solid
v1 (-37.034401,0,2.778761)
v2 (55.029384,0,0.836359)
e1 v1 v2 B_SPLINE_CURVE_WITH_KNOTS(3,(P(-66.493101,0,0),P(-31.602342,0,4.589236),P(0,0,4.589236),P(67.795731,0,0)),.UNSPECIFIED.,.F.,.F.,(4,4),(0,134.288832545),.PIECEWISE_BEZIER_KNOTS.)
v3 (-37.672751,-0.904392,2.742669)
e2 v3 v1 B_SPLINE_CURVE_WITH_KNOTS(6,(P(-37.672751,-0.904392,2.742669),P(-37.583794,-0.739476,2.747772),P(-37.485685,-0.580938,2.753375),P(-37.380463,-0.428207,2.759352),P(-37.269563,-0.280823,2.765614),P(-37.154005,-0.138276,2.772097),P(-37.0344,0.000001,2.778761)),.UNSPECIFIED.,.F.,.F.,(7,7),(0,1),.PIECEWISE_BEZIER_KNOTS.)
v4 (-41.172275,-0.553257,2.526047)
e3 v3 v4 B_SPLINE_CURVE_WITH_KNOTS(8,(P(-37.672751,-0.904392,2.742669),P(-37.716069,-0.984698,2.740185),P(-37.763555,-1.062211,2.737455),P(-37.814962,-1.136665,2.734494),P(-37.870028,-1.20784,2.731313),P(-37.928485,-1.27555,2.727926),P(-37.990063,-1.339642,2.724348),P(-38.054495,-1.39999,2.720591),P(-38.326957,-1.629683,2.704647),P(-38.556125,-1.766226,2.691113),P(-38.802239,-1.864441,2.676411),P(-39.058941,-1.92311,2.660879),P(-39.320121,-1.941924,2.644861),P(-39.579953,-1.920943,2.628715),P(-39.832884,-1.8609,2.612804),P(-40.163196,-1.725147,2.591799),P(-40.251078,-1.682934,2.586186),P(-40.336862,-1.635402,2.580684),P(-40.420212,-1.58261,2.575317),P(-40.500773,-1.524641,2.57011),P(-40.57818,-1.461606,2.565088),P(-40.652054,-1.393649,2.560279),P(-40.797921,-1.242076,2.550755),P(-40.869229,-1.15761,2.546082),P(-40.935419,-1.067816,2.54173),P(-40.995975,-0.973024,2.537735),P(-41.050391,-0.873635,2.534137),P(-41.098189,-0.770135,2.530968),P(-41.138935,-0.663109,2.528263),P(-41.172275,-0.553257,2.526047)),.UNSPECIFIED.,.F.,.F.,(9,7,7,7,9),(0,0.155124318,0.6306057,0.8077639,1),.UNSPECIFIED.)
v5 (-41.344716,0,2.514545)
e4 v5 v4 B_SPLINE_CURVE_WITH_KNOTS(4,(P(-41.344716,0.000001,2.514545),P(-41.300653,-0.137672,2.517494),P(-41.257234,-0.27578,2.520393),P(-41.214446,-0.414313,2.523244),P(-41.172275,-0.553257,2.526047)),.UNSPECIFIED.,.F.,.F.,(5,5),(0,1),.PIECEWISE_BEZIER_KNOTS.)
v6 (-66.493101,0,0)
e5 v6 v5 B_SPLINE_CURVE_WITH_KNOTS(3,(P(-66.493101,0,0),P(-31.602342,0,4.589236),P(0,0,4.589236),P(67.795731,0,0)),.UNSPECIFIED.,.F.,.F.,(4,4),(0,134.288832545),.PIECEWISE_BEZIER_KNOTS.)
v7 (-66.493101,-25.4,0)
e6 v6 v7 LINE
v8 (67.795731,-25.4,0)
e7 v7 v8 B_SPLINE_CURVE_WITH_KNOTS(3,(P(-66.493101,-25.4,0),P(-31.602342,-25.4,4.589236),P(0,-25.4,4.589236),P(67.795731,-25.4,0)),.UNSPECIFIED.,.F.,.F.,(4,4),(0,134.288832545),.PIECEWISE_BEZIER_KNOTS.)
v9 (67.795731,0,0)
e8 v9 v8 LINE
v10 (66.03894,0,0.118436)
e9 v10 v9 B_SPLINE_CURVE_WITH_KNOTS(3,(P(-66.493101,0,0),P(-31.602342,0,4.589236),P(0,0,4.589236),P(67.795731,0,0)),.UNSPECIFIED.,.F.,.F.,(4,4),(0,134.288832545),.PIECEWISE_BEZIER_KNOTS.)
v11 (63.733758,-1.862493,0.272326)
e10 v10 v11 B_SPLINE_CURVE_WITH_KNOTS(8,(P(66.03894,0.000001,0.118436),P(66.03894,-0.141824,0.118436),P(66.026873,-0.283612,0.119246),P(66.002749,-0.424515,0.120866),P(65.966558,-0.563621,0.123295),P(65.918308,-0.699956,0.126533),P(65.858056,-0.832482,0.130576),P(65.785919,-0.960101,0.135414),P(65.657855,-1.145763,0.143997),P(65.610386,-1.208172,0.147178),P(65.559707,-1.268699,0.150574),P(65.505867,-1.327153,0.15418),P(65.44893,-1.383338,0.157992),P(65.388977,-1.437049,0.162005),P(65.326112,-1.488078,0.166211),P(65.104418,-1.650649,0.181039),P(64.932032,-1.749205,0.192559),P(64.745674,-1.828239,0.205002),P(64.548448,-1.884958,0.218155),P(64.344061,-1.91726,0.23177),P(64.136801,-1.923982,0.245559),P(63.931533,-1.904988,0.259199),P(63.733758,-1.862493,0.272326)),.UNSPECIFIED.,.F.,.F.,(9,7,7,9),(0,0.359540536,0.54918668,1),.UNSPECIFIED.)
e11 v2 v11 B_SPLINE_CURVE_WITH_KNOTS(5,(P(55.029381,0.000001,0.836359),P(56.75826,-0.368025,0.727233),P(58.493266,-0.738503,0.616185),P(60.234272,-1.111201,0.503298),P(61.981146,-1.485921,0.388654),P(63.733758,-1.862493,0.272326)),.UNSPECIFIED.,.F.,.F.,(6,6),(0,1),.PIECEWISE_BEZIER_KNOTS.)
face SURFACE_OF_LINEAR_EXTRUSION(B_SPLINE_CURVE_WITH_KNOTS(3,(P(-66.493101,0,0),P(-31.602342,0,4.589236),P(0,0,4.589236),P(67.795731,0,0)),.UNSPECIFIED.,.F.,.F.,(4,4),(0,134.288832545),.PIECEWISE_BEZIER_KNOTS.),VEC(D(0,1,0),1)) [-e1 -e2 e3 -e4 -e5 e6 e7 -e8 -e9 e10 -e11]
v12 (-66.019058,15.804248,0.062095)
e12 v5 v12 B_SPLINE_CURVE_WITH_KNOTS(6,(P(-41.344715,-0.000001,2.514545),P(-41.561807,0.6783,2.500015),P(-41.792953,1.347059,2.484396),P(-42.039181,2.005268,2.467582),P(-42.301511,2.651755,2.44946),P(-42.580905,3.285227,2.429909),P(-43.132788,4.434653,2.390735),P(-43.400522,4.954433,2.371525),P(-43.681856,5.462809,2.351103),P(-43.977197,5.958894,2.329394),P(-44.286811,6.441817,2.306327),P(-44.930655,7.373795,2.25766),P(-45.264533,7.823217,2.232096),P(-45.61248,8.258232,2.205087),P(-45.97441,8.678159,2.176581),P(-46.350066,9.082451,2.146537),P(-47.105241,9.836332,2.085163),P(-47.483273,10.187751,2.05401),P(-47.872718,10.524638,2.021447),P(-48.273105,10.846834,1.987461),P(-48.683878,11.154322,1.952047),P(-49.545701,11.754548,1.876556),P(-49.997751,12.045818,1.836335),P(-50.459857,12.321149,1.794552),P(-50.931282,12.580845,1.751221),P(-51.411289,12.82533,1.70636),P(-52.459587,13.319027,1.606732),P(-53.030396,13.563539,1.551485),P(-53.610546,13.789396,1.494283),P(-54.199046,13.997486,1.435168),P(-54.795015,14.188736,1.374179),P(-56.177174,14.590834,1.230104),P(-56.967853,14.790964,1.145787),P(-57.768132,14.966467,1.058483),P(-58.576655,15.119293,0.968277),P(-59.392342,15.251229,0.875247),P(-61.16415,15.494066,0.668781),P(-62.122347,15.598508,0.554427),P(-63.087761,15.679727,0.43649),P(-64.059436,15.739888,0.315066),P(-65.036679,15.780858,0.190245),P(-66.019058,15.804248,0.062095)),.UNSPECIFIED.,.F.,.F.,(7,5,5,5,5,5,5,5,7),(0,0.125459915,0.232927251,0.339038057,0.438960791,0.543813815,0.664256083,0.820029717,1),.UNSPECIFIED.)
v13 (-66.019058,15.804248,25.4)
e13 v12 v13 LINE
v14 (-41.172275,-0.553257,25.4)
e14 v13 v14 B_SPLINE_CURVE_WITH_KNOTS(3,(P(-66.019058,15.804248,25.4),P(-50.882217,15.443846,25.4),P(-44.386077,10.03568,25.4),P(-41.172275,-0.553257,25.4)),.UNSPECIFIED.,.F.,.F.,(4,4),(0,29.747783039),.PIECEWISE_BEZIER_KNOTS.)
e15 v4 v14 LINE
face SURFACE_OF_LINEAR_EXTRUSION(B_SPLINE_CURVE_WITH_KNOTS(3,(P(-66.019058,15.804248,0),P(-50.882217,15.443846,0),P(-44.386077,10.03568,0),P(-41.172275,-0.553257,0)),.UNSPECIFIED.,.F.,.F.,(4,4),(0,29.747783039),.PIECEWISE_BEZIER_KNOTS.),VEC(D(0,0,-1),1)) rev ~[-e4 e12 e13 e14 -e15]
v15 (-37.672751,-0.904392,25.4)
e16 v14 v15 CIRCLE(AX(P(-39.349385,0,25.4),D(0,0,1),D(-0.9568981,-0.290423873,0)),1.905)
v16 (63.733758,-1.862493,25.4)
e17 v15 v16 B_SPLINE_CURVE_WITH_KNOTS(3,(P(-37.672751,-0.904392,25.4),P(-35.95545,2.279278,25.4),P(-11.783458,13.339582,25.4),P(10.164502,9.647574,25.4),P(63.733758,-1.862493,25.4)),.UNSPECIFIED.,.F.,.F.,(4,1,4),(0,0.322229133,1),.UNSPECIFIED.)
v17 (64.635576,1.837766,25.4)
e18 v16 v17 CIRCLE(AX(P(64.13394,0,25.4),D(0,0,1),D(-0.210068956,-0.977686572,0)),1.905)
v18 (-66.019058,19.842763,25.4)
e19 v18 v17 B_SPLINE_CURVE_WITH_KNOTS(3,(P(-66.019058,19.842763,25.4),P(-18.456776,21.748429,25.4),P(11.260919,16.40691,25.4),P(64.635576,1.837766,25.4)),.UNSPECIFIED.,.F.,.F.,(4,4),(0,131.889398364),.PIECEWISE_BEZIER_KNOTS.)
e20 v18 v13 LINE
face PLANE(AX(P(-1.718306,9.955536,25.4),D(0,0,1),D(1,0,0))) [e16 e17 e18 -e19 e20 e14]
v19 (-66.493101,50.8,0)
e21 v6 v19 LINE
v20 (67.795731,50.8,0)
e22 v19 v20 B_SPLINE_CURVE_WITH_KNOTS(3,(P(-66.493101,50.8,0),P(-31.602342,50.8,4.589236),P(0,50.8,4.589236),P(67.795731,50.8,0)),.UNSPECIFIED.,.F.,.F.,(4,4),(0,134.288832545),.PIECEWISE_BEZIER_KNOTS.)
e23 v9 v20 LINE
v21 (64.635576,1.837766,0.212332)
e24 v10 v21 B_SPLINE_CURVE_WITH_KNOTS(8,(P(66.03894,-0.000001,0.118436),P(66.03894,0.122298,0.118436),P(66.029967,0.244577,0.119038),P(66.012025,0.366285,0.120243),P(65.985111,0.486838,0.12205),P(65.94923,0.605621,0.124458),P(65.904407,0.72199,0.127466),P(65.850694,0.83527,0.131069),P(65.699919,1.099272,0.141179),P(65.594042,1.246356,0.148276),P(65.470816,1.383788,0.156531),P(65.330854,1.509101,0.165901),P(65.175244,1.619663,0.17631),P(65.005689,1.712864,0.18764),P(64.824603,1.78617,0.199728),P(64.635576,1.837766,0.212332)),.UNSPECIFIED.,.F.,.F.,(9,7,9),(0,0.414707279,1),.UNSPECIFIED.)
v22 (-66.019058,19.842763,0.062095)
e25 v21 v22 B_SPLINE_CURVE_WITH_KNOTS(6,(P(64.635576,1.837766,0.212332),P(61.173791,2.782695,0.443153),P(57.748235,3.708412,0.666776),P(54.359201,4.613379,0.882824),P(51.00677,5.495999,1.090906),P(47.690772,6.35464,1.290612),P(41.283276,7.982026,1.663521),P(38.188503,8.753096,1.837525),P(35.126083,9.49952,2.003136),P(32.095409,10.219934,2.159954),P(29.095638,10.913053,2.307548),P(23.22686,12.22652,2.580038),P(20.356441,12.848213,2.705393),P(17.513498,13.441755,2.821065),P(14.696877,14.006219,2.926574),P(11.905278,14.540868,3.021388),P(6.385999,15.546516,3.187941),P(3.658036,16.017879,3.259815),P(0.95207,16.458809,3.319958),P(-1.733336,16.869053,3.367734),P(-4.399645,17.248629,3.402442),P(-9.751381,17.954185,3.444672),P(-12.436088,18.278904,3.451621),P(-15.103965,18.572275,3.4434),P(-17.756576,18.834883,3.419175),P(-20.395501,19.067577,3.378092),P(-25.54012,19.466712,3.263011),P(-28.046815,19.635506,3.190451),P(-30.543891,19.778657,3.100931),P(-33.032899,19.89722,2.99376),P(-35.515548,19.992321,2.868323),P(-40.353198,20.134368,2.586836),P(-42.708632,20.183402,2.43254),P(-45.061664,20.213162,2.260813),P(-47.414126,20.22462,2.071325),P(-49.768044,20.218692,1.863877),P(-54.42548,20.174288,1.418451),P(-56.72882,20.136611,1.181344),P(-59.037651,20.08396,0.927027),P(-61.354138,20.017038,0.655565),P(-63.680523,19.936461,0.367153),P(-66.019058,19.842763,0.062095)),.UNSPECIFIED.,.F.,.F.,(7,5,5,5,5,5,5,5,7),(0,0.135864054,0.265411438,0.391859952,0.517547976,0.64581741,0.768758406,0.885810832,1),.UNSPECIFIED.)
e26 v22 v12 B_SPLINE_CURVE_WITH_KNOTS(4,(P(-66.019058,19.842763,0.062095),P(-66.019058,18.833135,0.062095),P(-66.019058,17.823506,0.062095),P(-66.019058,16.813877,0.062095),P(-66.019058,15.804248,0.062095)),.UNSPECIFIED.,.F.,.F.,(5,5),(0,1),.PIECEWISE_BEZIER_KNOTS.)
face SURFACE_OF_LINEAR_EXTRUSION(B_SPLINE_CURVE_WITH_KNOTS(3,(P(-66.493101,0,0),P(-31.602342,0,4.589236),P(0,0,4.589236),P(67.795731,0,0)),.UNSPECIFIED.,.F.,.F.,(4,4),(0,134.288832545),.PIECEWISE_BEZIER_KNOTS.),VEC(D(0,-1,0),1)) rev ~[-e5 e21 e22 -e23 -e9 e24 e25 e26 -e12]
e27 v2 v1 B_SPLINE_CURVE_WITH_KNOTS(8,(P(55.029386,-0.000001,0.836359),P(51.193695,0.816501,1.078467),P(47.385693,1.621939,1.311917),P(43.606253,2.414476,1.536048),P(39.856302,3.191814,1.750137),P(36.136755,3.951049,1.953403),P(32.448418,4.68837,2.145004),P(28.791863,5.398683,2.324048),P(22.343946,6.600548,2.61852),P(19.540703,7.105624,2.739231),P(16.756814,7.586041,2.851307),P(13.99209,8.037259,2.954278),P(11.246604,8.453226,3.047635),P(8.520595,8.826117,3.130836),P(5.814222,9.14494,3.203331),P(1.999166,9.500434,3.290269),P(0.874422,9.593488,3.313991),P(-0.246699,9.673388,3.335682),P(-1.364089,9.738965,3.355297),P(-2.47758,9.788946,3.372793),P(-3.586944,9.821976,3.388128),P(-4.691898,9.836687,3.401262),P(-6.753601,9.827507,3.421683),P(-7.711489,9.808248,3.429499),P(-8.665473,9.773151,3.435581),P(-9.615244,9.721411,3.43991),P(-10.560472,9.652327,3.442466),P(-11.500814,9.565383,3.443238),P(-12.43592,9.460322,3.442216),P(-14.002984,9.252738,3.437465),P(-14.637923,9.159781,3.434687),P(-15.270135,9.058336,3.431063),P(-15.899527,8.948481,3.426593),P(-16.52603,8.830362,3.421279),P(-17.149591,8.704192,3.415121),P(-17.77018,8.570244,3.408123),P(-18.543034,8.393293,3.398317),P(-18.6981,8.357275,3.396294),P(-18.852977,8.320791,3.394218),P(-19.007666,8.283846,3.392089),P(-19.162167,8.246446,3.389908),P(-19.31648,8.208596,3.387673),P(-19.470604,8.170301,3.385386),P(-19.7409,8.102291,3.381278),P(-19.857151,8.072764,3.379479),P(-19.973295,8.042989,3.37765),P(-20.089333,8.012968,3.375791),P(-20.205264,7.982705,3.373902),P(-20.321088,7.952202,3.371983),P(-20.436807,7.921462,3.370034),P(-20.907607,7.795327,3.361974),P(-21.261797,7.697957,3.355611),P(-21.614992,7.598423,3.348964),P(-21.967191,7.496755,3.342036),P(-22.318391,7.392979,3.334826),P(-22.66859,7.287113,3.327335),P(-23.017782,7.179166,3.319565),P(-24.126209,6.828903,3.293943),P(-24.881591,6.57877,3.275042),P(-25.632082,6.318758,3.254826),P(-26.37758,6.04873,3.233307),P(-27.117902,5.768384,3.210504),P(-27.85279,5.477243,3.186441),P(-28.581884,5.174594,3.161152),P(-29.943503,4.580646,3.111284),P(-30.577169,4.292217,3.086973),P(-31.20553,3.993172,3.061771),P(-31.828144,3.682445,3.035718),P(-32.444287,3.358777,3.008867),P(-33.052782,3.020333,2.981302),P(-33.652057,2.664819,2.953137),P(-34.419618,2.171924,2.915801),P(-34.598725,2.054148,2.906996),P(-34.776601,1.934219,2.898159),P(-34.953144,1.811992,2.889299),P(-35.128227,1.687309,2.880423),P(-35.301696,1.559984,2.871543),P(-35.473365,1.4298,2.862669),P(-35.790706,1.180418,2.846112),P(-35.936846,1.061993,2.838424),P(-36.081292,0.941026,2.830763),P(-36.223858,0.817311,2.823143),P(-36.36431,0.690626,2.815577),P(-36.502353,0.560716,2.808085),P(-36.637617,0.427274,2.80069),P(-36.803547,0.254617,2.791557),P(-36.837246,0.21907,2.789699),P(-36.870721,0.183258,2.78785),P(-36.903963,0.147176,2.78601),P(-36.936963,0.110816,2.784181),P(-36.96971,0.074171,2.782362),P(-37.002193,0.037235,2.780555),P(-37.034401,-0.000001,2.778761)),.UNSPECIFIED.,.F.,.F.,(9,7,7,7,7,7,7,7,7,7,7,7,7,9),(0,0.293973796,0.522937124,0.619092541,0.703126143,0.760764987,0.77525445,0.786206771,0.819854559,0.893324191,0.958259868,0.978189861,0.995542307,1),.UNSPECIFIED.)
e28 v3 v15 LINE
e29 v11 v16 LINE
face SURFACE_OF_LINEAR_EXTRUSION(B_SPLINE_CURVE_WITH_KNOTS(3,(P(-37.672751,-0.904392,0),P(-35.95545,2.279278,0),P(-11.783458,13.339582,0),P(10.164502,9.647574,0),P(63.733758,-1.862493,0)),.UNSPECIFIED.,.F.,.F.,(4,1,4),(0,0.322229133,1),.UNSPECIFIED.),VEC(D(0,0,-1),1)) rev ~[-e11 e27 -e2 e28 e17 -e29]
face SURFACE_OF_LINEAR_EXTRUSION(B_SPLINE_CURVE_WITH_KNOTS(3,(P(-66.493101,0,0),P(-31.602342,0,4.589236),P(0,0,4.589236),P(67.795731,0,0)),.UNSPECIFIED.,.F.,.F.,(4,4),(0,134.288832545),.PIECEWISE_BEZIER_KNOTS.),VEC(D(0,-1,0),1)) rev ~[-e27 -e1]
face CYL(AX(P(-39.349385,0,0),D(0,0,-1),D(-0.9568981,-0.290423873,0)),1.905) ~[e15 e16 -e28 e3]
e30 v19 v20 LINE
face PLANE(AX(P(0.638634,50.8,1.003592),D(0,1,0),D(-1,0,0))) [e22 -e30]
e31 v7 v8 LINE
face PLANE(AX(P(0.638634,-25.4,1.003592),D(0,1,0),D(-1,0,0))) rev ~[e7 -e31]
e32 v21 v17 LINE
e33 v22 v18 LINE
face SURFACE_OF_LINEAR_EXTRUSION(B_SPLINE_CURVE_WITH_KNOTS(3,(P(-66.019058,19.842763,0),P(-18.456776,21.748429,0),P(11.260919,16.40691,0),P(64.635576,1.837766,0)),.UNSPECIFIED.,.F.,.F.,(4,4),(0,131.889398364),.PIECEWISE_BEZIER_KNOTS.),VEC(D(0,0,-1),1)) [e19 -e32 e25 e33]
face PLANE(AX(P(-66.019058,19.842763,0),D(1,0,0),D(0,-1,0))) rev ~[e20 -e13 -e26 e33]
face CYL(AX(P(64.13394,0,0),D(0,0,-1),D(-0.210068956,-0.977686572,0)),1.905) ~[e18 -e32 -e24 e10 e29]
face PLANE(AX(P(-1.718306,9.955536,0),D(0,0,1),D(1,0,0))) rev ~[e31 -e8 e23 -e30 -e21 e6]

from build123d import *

# Parameters (mm, degrees)
F2_DEPTH      = 25.4
F2_DEPTH_BACK = 50.8
F3_DEPTH      = 25.4


with BuildPart() as f2:
    # F1 (on Front) → F2 (new body, two sides)
    with BuildSketch(Plane.XZ) as f2_sk:
        with BuildLine():
            add(Edge.make_bspline(
                [(-66.493101418, 0), (-31.6023416817, 4.5892358758), (0, 4.5892358758), (67.7957311273, 0)],
                knots=[0, 0, 0, 0, 134.2888325453, 134.2888325453, 134.2888325453, 134.2888325453], degree=3))
            Line((-66.493101418, 0), (67.7957311273, 0))
        make_face()
    extrude(amount=F2_DEPTH)
    extrude(f2_sk.sketch, amount=-F2_DEPTH_BACK)

    # F0 (on Top) → F3 (join)
    with BuildSketch(Plane.XY):
        with BuildLine():
            add(Edge.make_bspline(
                [(-66.0190582275, 15.8042479306), (-50.882216543, 15.443845652), (-44.3860767732, 10.0356803936), (-41.1722754867, -0.5532574777)],
                knots=[0, 0, 0, 0, 29.7477830393, 29.7477830393, 29.7477830393, 29.7477830393], degree=3))
            ThreePointArc((-41.1722754867, -0.5532574777), (-39.5395729632, -1.8954823631), (-37.6727509093, -0.9043917556))
            add(Edge.make_bspline(
                [(-37.6727509093, -0.9043917556), (-35.9554500646, 2.279277761), (-11.7834584129, 13.3395817627), (10.1645017819, 9.6475739081), (63.7337581556, -1.8624929201)],
                knots=[0, 0, 0, 0, 0.3222291325, 1, 1, 1, 1], degree=3))
            ThreePointArc((63.7337581556, -1.8624929201), (65.9847645302, -0.4510784554), (64.6355761504, 1.8377664946))
            add(Edge.make_bspline(
                [(-66.0190582275, 19.8427634791), (-18.4567762815, 21.7484285157), (11.260919046, 16.4069097143), (64.6355761504, 1.8377664946)],
                knots=[0, 0, 0, 0, 131.8893983641, 131.8893983641, 131.8893983641, 131.8893983641], degree=3))
            Line((-66.0190582275, 19.8427634791), (-66.0190582275, 15.8042479306))
        make_face()
    extrude(amount=F3_DEPTH)


solid = f2.part
